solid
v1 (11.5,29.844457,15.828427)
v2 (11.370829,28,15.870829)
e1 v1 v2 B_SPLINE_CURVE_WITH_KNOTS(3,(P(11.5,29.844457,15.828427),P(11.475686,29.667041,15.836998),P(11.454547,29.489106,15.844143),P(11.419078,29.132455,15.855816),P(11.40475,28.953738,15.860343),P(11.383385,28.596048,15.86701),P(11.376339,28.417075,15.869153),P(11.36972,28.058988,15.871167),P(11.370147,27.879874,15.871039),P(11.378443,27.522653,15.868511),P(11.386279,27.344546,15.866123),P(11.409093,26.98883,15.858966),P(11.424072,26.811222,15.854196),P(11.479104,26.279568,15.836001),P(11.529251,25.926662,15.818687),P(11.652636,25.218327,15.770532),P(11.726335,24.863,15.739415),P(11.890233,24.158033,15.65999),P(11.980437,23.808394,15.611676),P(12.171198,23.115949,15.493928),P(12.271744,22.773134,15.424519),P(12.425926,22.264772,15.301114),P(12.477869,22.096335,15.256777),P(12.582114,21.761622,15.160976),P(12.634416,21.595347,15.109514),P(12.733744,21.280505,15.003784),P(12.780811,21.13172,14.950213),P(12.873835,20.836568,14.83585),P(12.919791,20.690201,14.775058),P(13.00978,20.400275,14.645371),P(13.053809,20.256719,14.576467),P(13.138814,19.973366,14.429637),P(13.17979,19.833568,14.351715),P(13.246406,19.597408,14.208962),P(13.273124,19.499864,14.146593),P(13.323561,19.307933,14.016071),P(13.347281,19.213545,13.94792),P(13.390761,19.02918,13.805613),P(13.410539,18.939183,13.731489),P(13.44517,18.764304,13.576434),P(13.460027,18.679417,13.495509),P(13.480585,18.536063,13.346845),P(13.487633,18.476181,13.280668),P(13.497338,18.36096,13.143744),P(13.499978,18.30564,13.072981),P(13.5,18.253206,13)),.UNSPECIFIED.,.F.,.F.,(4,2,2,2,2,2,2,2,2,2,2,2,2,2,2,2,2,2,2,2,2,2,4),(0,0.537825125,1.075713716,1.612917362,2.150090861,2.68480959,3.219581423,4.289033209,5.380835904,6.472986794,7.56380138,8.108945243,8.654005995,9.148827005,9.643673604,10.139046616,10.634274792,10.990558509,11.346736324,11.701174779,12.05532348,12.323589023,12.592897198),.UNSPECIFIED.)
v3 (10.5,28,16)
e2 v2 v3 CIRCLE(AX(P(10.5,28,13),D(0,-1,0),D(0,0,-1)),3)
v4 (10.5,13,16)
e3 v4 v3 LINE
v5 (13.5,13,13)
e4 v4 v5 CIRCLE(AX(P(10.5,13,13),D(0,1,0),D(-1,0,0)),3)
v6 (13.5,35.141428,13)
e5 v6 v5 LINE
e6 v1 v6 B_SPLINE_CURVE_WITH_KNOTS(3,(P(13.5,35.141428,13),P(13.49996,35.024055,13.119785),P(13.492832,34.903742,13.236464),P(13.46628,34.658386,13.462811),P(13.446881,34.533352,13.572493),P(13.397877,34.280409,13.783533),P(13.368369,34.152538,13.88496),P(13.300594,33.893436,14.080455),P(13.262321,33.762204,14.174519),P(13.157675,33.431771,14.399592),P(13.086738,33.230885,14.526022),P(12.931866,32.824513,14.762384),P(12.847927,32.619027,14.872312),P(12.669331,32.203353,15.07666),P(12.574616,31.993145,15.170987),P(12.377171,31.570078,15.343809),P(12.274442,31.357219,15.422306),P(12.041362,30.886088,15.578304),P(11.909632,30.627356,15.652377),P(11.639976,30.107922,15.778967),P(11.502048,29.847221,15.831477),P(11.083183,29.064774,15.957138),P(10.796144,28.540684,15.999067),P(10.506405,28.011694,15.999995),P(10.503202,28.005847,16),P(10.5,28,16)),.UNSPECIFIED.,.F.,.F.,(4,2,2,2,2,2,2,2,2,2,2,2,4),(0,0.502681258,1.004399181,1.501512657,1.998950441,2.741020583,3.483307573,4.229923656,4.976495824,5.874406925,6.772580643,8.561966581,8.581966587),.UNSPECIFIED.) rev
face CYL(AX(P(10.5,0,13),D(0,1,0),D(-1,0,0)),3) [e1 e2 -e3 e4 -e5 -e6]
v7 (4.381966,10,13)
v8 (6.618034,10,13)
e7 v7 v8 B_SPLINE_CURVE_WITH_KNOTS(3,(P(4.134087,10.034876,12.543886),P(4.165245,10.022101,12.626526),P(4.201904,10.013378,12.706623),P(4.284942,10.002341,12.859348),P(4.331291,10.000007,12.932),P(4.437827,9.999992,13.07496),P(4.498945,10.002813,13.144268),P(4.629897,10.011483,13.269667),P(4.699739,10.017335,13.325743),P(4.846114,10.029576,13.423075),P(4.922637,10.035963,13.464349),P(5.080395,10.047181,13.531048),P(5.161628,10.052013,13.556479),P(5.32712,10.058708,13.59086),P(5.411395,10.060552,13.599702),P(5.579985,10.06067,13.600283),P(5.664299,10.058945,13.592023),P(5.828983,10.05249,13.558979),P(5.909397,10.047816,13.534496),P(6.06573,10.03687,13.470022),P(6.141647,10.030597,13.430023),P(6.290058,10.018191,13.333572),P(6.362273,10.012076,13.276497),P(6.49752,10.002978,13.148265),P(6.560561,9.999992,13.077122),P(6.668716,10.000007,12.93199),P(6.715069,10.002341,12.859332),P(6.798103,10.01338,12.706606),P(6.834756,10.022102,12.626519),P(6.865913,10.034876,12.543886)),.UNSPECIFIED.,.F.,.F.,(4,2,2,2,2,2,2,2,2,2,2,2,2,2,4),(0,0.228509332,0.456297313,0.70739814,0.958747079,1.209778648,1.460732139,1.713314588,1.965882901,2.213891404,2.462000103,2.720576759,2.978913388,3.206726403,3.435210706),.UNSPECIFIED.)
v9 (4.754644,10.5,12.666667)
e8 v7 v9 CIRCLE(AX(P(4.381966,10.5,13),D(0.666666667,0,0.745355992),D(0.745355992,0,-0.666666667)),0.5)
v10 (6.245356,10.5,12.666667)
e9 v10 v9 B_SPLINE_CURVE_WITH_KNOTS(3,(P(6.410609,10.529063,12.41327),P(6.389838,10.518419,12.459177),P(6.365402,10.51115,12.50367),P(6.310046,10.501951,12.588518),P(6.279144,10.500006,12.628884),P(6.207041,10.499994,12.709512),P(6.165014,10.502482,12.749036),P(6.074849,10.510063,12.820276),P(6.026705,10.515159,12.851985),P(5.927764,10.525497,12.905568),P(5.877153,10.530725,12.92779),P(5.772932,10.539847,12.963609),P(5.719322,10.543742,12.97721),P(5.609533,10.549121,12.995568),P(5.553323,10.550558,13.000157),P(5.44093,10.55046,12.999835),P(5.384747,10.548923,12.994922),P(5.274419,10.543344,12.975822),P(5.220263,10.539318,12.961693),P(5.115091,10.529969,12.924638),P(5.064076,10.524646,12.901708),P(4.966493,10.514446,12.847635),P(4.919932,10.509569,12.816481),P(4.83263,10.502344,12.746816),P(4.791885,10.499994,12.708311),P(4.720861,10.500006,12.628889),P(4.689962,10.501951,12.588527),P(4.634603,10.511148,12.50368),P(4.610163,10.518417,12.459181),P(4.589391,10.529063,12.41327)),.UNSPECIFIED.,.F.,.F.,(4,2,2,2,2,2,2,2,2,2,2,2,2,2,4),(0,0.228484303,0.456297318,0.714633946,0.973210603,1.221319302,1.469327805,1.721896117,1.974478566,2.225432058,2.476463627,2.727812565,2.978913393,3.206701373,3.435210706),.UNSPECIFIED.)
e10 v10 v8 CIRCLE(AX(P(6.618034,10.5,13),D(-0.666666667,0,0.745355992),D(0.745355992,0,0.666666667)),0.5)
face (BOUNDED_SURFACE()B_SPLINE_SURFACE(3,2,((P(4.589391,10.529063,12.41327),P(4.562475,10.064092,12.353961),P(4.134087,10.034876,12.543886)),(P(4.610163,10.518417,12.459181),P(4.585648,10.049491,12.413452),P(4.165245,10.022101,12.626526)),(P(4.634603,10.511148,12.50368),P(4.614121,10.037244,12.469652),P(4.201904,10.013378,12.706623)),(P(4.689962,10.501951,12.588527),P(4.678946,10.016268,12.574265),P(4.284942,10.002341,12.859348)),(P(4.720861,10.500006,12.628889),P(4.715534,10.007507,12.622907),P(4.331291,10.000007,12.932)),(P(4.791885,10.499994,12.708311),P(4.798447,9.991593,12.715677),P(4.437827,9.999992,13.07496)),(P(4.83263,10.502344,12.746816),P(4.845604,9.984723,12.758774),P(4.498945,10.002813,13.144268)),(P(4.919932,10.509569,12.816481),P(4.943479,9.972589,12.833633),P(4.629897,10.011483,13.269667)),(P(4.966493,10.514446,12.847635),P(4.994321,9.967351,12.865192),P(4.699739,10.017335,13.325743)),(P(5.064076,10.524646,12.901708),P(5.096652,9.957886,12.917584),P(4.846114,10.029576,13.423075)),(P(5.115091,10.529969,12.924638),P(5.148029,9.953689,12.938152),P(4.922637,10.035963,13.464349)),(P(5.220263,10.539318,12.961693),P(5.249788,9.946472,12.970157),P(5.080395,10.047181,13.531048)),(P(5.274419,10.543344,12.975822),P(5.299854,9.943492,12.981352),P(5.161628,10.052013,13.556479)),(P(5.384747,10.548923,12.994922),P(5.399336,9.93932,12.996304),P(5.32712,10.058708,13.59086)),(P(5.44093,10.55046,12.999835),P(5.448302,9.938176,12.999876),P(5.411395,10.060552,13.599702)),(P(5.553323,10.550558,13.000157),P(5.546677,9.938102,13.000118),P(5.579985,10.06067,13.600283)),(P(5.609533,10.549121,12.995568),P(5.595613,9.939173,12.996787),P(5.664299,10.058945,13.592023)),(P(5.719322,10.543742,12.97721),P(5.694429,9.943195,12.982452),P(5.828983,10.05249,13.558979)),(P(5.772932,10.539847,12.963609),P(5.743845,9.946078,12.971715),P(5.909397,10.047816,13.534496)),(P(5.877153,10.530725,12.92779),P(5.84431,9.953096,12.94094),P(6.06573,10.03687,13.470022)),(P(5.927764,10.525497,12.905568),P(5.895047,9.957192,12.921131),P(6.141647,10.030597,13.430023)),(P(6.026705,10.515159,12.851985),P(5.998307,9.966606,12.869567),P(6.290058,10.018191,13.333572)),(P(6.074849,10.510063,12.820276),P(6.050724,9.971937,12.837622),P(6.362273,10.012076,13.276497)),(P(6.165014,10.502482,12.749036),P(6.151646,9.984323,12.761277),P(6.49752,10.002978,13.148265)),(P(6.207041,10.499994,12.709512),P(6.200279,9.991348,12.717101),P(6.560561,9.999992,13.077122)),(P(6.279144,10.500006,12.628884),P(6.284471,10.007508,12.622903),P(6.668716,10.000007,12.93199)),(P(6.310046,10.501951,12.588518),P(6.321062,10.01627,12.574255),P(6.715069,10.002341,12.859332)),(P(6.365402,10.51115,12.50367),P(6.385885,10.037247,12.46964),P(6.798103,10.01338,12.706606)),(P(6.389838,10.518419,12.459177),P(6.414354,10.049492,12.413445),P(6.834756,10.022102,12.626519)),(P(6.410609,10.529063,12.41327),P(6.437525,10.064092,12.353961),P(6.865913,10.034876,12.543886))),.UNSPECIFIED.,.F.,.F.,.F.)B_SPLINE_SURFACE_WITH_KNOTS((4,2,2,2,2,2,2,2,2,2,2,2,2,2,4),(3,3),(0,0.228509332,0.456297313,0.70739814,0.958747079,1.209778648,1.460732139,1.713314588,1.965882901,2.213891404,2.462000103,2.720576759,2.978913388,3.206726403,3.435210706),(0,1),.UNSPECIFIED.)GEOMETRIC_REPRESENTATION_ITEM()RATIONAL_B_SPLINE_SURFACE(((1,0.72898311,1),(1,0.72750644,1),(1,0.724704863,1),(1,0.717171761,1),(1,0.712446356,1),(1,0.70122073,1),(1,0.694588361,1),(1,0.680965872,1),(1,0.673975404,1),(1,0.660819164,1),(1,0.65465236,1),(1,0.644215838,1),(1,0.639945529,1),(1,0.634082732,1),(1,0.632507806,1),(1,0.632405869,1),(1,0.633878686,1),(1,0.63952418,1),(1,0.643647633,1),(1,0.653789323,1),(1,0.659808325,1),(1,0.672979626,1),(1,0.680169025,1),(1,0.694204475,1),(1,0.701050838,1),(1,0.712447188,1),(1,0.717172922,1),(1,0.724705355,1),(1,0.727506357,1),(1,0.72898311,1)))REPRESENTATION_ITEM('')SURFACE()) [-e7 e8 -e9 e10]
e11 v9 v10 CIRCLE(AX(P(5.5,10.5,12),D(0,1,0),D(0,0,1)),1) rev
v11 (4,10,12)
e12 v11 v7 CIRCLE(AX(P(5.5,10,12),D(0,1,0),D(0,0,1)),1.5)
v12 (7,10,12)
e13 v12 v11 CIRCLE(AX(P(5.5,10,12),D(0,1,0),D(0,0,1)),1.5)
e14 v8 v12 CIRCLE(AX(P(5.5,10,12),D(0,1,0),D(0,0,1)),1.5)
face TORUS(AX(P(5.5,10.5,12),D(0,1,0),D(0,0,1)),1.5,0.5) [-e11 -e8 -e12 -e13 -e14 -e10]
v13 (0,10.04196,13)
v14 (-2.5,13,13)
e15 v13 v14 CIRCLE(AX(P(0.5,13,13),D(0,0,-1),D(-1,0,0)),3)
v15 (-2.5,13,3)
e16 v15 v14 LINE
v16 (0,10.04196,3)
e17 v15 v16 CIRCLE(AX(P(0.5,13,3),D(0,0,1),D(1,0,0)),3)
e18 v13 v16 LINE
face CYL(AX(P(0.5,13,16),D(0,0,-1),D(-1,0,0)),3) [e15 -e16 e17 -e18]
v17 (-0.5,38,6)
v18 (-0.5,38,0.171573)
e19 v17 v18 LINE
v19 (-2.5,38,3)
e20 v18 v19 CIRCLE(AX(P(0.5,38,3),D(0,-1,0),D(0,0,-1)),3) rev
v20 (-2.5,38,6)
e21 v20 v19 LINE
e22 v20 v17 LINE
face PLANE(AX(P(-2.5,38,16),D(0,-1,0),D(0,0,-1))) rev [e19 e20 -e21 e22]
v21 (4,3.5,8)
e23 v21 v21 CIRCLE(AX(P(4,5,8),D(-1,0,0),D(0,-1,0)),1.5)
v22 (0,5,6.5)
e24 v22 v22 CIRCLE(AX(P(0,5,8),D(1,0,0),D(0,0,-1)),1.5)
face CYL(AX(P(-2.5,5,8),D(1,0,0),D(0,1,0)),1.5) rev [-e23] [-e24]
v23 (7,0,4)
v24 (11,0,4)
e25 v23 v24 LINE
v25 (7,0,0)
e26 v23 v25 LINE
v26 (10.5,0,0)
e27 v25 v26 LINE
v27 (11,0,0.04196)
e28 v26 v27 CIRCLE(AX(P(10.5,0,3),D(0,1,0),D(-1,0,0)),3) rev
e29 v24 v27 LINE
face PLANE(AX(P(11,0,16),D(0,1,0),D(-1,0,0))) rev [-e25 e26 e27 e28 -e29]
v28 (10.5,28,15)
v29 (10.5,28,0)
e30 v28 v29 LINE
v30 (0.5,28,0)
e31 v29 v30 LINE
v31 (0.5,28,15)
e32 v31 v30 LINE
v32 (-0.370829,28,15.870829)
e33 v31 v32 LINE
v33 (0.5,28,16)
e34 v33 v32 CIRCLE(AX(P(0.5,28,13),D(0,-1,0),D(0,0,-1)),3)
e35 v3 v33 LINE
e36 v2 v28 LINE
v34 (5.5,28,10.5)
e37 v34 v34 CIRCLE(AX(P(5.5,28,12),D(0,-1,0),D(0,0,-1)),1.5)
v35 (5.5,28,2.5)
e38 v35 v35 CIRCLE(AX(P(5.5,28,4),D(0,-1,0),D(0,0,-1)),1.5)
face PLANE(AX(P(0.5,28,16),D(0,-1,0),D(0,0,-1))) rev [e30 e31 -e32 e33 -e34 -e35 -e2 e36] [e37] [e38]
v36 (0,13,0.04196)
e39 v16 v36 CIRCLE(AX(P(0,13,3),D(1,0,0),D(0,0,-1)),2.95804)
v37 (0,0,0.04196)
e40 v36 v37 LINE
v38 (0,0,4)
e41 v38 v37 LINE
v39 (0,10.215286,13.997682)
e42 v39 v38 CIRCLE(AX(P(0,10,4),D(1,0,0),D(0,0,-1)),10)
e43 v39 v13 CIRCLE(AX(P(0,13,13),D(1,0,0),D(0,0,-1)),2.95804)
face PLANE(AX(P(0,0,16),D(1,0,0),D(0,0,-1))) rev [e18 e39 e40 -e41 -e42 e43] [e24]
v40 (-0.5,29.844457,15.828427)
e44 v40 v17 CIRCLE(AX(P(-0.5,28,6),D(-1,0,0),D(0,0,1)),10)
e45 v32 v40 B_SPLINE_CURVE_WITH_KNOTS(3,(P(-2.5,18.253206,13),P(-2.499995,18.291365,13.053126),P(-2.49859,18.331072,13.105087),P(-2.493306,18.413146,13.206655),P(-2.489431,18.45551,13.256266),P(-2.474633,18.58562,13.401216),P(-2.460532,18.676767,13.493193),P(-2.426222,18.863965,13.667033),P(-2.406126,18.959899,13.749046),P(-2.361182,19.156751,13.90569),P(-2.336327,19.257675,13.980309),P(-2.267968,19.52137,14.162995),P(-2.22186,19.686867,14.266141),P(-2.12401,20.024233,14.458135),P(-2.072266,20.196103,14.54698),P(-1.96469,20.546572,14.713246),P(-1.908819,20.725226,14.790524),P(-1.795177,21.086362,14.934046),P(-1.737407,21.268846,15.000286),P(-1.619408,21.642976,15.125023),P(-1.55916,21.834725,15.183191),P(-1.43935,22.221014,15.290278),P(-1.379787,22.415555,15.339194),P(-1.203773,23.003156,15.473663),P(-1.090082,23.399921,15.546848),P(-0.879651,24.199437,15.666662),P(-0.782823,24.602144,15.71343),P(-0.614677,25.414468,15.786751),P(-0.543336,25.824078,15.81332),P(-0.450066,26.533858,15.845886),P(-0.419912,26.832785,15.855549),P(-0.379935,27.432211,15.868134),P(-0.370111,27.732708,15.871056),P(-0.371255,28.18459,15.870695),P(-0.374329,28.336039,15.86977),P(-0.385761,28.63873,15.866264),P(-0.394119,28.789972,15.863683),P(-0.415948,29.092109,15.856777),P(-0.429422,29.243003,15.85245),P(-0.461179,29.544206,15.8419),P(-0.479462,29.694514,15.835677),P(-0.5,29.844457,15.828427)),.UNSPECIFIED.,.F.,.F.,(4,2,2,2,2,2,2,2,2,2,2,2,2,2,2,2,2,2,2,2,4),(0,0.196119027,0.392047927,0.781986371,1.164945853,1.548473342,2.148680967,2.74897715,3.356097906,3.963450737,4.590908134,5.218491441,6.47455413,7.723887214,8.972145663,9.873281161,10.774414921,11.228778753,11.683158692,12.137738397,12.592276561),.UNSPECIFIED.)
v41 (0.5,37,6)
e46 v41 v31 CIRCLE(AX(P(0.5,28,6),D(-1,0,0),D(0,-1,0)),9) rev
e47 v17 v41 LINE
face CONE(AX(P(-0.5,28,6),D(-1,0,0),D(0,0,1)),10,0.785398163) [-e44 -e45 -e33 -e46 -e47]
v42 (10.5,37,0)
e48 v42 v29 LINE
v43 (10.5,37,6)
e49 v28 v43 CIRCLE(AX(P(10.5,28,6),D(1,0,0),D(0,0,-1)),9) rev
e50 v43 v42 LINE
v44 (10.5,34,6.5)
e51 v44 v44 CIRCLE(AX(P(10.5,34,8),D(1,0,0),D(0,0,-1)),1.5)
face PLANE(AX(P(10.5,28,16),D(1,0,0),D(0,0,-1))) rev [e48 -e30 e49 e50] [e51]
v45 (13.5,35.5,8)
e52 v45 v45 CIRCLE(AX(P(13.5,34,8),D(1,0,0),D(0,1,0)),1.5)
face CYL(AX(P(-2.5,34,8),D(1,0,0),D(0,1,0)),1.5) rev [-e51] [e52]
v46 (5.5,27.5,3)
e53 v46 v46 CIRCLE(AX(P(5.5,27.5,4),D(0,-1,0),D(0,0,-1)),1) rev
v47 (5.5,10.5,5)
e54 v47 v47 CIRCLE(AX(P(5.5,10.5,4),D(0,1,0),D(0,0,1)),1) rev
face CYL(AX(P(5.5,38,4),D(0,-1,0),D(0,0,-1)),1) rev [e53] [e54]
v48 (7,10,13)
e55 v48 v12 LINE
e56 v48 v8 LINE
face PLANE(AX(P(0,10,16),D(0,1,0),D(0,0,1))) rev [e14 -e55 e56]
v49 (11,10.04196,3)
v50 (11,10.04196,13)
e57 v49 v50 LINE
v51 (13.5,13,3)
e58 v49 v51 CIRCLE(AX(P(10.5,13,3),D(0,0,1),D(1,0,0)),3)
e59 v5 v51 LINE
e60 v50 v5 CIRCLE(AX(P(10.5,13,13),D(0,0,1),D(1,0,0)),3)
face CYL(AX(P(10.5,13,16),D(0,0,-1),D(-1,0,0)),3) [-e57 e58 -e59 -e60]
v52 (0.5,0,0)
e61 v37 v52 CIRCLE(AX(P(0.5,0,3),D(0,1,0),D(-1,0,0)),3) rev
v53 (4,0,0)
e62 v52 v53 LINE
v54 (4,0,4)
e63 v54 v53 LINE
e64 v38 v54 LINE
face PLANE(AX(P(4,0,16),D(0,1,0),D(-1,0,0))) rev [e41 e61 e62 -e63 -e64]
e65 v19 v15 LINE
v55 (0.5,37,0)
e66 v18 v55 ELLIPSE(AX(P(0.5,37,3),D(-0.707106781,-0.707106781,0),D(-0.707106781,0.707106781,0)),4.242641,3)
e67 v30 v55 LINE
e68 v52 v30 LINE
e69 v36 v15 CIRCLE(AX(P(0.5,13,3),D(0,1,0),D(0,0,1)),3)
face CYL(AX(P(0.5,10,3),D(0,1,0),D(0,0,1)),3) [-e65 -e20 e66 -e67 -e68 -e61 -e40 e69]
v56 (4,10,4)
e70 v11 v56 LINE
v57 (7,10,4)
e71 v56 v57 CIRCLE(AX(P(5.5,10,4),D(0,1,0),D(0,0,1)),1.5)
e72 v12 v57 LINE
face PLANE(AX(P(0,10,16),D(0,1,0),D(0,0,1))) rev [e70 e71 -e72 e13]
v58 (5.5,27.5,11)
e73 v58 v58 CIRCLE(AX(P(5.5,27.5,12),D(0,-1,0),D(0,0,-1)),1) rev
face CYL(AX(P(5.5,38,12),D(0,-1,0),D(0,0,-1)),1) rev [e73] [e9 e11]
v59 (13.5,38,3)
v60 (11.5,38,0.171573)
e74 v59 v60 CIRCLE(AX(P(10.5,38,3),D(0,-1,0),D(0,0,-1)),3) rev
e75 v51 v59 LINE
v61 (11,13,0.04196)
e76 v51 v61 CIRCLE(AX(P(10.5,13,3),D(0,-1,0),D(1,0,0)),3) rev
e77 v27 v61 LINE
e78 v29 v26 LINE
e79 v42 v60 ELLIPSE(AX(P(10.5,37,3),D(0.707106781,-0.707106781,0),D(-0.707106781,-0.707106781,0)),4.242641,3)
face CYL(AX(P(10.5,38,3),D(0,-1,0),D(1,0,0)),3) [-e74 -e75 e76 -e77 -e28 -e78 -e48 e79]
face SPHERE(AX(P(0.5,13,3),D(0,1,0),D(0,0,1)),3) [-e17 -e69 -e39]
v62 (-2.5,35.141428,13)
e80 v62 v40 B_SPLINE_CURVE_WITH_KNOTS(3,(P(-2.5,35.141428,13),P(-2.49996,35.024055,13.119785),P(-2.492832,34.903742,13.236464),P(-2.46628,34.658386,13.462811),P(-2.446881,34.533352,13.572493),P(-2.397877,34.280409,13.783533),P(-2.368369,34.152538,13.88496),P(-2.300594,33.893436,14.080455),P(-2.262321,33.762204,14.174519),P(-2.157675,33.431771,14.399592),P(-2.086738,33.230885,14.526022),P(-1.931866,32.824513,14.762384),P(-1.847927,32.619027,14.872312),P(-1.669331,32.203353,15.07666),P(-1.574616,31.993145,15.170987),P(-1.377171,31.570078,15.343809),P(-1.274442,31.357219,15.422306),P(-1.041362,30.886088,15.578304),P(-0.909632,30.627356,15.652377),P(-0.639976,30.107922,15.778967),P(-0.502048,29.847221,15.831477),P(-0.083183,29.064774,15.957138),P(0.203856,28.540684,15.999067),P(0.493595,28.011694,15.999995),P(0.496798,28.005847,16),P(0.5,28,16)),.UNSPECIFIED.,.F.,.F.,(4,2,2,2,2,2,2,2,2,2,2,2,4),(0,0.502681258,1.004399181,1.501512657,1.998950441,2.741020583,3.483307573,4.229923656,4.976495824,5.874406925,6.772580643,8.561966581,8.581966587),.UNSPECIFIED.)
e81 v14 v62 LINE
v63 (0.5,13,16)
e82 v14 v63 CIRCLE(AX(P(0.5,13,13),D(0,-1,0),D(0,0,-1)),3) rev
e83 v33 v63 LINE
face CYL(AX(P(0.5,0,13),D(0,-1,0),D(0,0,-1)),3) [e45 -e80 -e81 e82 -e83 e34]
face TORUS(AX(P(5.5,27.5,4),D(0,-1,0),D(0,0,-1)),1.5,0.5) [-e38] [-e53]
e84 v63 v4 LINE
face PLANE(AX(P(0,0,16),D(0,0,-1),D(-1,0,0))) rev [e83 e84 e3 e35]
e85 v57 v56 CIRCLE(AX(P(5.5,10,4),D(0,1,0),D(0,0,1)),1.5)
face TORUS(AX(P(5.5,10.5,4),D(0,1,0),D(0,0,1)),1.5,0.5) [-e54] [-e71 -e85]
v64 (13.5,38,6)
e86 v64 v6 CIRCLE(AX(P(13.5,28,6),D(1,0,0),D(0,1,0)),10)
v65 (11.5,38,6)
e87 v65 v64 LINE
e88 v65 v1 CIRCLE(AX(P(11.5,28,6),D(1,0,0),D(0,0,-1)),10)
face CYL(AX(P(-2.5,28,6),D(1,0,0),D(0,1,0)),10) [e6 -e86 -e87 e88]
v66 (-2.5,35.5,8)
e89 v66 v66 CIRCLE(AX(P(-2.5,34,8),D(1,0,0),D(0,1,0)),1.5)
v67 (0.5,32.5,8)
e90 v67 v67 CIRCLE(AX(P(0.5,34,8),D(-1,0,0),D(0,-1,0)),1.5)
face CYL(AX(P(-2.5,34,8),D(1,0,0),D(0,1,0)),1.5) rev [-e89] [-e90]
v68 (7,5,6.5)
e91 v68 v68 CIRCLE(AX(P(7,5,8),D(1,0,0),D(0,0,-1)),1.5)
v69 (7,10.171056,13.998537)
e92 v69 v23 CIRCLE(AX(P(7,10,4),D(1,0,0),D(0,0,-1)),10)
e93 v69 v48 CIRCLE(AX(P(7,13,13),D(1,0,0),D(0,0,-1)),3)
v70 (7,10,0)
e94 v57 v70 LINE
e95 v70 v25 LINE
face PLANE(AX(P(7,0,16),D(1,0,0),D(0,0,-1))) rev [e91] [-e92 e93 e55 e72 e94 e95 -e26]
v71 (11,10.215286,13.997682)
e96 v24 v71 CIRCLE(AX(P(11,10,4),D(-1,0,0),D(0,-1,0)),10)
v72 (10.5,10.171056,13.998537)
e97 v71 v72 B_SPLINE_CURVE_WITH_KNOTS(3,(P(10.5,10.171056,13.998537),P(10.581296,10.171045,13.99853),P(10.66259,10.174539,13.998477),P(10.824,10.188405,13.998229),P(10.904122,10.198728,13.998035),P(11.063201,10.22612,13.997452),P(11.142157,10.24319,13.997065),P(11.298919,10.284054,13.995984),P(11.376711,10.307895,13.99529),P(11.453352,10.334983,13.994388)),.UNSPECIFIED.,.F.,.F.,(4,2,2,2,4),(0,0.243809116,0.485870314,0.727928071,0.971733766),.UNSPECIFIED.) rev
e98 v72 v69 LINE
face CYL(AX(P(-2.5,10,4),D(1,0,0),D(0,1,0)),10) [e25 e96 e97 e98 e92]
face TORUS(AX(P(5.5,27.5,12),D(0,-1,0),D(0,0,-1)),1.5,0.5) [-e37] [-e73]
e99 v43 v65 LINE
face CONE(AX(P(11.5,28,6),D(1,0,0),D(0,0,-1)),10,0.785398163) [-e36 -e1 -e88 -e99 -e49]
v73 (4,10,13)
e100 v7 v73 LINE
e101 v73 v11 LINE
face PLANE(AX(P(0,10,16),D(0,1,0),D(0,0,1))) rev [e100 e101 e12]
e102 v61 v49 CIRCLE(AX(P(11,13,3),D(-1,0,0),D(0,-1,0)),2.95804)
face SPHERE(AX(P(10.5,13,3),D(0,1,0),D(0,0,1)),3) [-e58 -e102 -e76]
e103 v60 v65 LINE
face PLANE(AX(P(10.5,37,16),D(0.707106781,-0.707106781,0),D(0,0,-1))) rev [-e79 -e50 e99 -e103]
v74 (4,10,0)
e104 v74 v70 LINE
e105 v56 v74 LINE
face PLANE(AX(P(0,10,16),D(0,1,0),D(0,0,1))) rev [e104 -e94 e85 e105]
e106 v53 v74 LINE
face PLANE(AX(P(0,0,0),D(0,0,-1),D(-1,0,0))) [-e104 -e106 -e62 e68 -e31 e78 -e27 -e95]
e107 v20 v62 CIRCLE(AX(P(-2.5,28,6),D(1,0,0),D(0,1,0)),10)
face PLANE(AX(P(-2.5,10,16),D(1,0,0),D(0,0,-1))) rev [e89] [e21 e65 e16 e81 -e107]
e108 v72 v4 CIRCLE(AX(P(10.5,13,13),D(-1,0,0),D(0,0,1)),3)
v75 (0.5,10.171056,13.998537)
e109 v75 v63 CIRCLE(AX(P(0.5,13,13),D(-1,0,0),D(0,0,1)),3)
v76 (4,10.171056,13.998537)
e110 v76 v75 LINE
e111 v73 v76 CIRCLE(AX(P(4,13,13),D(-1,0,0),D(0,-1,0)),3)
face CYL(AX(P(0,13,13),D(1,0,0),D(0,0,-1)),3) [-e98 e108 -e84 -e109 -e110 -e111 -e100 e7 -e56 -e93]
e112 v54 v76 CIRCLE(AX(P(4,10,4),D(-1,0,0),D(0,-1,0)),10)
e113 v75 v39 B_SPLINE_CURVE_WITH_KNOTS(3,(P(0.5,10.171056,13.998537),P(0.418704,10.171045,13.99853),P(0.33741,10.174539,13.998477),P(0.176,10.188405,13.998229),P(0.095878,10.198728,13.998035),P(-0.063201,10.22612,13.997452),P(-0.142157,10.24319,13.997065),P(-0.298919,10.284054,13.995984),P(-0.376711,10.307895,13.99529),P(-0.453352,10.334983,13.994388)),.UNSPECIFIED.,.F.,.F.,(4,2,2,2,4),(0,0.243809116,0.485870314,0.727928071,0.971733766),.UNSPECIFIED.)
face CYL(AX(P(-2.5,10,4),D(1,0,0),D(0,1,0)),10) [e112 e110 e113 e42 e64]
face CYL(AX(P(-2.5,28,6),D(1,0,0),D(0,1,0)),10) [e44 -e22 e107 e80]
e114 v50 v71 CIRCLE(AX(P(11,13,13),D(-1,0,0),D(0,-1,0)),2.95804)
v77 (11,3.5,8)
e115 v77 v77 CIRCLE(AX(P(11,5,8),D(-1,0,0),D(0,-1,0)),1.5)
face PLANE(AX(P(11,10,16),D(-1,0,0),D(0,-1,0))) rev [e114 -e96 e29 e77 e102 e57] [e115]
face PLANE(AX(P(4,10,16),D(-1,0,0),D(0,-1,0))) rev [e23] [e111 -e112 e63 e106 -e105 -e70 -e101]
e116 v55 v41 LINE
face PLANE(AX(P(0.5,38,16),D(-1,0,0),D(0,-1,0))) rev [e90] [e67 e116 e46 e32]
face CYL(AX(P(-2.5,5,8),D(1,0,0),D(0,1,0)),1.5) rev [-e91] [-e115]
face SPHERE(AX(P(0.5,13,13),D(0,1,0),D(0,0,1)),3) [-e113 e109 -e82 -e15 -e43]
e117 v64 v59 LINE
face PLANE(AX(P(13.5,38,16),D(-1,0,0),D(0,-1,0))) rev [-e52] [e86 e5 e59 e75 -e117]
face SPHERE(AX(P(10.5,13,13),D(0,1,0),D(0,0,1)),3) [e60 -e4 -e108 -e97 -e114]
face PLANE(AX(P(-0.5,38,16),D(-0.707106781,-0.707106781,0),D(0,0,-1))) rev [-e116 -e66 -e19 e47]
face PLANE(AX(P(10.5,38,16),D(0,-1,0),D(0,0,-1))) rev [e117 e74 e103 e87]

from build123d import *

# Parameters (mm, degrees)
BOSS_EXTRUDE1_DEPTH     = 16
CUT_EXTRUDE1_DEPTH      = 44.384905209
CUT_EXTRUDE1_DEPTH_BACK = 44.384905209
SKETCH2_R               = 1.5
FILLET1_DEPTH           = 38
SKETCH3_R               = 1
CUT_EXTRUDE2_DEPTH      = 35.960692377
FILLET2_R               = 3
CHAMFER1_SIZE           = 1
CONG_1_R                = 0.5


with BuildPart() as part:
    # Sketch1 → Boss-Extrude1 (new body)
    with BuildSketch(Plane.XY):
        Polygon((0, 0), (0, 10), (-2.5, 10), (-2.5, 38), (0.5, 38), (0.5, 28), (10.5, 28), (10.5, 38), (13.5, 38), (13.5, 10), (11, 10), (11, 0), (7, 0), (7, 10), (4, 10), (4, 0), align=None)
    extrude(amount=BOSS_EXTRUDE1_DEPTH)

    # Sketch2 → Cut-Extrude1 (cut, two sides: drawn at the far end of the back side and taken through both)
    with BuildSketch(Plane(origin=(11, 0, 0), x_dir=(0, 0, -1), z_dir=(1, 0, 0)).offset(-CUT_EXTRUDE1_DEPTH_BACK)):
        with BuildLine():
            Line((-16, 0), (-4, 0))
            ThreePointArc((-4, 0), (-11.071067812, 2.928932188), (-14, 10))
            Line((-14, 10), (-16, 10))
            Line((-16, 10), (-16, 0))
        make_face()
        with BuildLine():
            Line((-16, 38), (-16, 28))
            ThreePointArc((-16, 28), (-13.071067812, 35.071067812), (-6, 38))
            Line((-6, 38), (-16, 38))
        make_face()
        with Locations((-8, 5)):
            Circle(SKETCH2_R)
        with Locations(Location((-8, 34, 0), (0, 0, 90))):
            Circle(SKETCH2_R)
    extrude(amount=CUT_EXTRUDE1_DEPTH + CUT_EXTRUDE1_DEPTH_BACK, mode=Mode.SUBTRACT)

    # Fillet1: read off the stored shape, not the designer's step
    # Fillet1 outline → Fillet1 (cut)
    with BuildSketch(Plane(origin=(0, 0, 0), x_dir=(1, 0, 0), z_dir=(0, 1, 0))):
        with BuildLine():
            Line((13.5, 0), (10.5, 0))
            ThreePointArc((10.5, 0), (12.621320344, -0.878679656), (13.5, -3))
            Line((13.5, -3), (13.5, 0))
        make_face()
        with BuildLine():
            ThreePointArc((-2.5, -3), (-1.621320344, -0.878679656), (0.5, 0))
            Line((0.5, 0), (-2.5, 0))
            Line((-2.5, 0), (-2.5, -3))
        make_face()
        with BuildLine():
            Line((13.5, -16), (13.5, -13))
            ThreePointArc((13.5, -13), (12.621320344, -15.121320344), (10.5, -16))
            Line((10.5, -16), (13.5, -16))
        make_face()
        with BuildLine():
            ThreePointArc((0.5, -16), (-1.621320344, -15.121320344), (-2.5, -13))
            Line((-2.5, -13), (-2.5, -16))
            Line((-2.5, -16), (0.5, -16))
        make_face()
    extrude(amount=FILLET1_DEPTH, mode=Mode.SUBTRACT)

    # Sketch3 → Cut-Extrude2 (cut, through all)
    with BuildSketch(Plane.XZ.offset(-10)):
        with Locations(Location((5.5, 12, 0), (0, 0, 270))):
            Circle(SKETCH3_R)
        with Locations(Location((5.5, 4, 0), (0, 0, 270))):
            Circle(SKETCH3_R)
    extrude(amount=-CUT_EXTRUDE2_DEPTH, mode=Mode.SUBTRACT)

    # Fillet2
    # the kernel refuses this fillet: 3 mm, written as the material it takes off along each edge
    with BuildSketch(Plane(origin=(0.499999998, 10, 2.999999998), x_dir=(-1.0, 0, 5.011576341616869e-10), z_dir=(5.011576341616869e-10, 0, 1.0))) as fillet2_piece_1_section:
        with BuildLine():
            CenterArc((2.999999998 - FILLET2_R, -FILLET2_R), FILLET2_R, 0, 89.999999971)
            Line((2.999999998 - FILLET2_R, 0), (2.999999998, 0))
            Line((2.999999998, 0), (2.999999998, -FILLET2_R))
        make_face()
    fillet2_piece_1 = revolve(axis=Axis((0.499999998, 10, 2.999999998), (0, -1, 0)), revolution_arc=223.691304691, mode=Mode.PRIVATE)
    fillet2_piece_1 = split(fillet2_piece_1, bisect_by=Plane(origin=(0, 10, 2.999999998), z_dir=(-1, 0, 0)), keep=Keep.TOP, mode=Mode.PRIVATE)
    add(fillet2_piece_1, mode=Mode.SUBTRACT)
    with BuildSketch(Plane(origin=(10.500000002, 10, 2.999999998), x_dir=(-0.7230719874734535, 0, 0.6907726839787384), z_dir=(0.6907726839787384, 0, 0.7230719874734535))) as fillet2_piece_2_section:
        with BuildLine():
            CenterArc((2.999999998 - FILLET2_R, -FILLET2_R), FILLET2_R, 0, 89.999999971)
            Line((2.999999998, -FILLET2_R), (2.999999998, 0))
            Line((2.999999998, 0), (2.999999998 - FILLET2_R, 0))
        make_face()
    fillet2_piece_2 = revolve(axis=Axis((10.500000002, 10, 2.999999998), (0, -1, 0)), revolution_arc=223.691304691, mode=Mode.PRIVATE)
    fillet2_piece_2 = split(fillet2_piece_2, bisect_by=Plane(origin=(11, 10, 2.999999998), z_dir=(1, 0, 0)), keep=Keep.TOP, mode=Mode.PRIVATE)
    add(fillet2_piece_2, mode=Mode.SUBTRACT)
    with BuildSketch(Plane(origin=(10.5, 10, 16), x_dir=(0, 0, -1), z_dir=(-1, 0, 0))) as fillet2_piece_3_section:
        with BuildLine():
            CenterArc((FILLET2_R, -FILLET2_R), FILLET2_R, 90, 90)
            Line((0, -FILLET2_R), (0, 0))
            Line((0, 0), (FILLET2_R, 0))
        make_face()
    fillet2_piece_3 = extrude(amount=10, mode=Mode.PRIVATE)
    fillet2_piece_3 = fillet2_piece_3 - Plane(origin=(10.5, 10, 4), x_dir=(0, -1, 0), z_dir=(-1, 0, 0)) * Cylinder(10, 32, mode=Mode.PRIVATE)
    fillet2_piece_3 = split(fillet2_piece_3, bisect_by=Plane(origin=(7, 10, 16), z_dir=(1, 0, 0)), keep=Keep.TOP, mode=Mode.PRIVATE)
    add(fillet2_piece_3, mode=Mode.SUBTRACT)
    with BuildSketch(Plane(origin=(10.5, 10, 16), x_dir=(0, 0, -1), z_dir=(-1, 0, 0))) as fillet2_piece_4_section:
        with BuildLine():
            CenterArc((FILLET2_R, -FILLET2_R), FILLET2_R, 90, 90)
            Line((0, -FILLET2_R), (0, 0))
            Line((0, 0), (FILLET2_R, 0))
        make_face()
    fillet2_piece_4 = extrude(amount=10, mode=Mode.PRIVATE)
    fillet2_piece_4 = fillet2_piece_4 & Plane(origin=(10.5, 10, 4), x_dir=(0, -1, 0), z_dir=(-1, 0, 0)) * Cylinder(10, 32, mode=Mode.PRIVATE)
    fillet2_piece_4 = split(fillet2_piece_4, bisect_by=Plane(origin=(4, 10, 16), z_dir=(1, 0, 0)), keep=Keep.TOP, mode=Mode.PRIVATE)
    fillet2_piece_4 = split(fillet2_piece_4, bisect_by=Plane(origin=(7, 10, 16), z_dir=(-1, 0, 0)), keep=Keep.TOP, mode=Mode.PRIVATE)
    add(fillet2_piece_4, mode=Mode.SUBTRACT)
    with BuildSketch(Plane(origin=(10.5, 10, 16), x_dir=(0, 0, -1), z_dir=(-1, 0, 0))) as fillet2_piece_5_section:
        with BuildLine():
            CenterArc((FILLET2_R, -FILLET2_R), FILLET2_R, 90, 90)
            Line((0, -FILLET2_R), (0, 0))
            Line((0, 0), (FILLET2_R, 0))
        make_face()
    fillet2_piece_5 = extrude(amount=10, mode=Mode.PRIVATE)
    fillet2_piece_5 = fillet2_piece_5 - Plane(origin=(10.5, 10, 4), x_dir=(0, -1, 0), z_dir=(-1, 0, 0)) * Cylinder(10, 32, mode=Mode.PRIVATE)
    fillet2_piece_5 = split(fillet2_piece_5, bisect_by=Plane(origin=(4, 10, 16), z_dir=(1, 0, 0)), keep=Keep.TOP, mode=Mode.PRIVATE)
    fillet2_piece_5 = split(fillet2_piece_5, bisect_by=Plane(origin=(7, 10, 16), z_dir=(-1, 0, 0)), keep=Keep.TOP, mode=Mode.PRIVATE)
    add(fillet2_piece_5, mode=Mode.SUBTRACT)
    with BuildSketch(Plane(origin=(10.5, 10, 16), x_dir=(0, 0, -1), z_dir=(-1, 0, 0))) as fillet2_piece_6_section:
        with BuildLine():
            CenterArc((FILLET2_R, -FILLET2_R), FILLET2_R, 90, 90)
            Line((0, -FILLET2_R), (0, 0))
            Line((0, 0), (FILLET2_R, 0))
        make_face()
    fillet2_piece_6 = extrude(amount=10, mode=Mode.PRIVATE)
    fillet2_piece_6 = fillet2_piece_6 - Plane(origin=(10.5, 10, 4), x_dir=(0, -1, 0), z_dir=(-1, 0, 0)) * Cylinder(10, 32, mode=Mode.PRIVATE)
    fillet2_piece_6 = split(fillet2_piece_6, bisect_by=Plane(origin=(4, 10, 16), z_dir=(-1, 0, 0)), keep=Keep.TOP, mode=Mode.PRIVATE)
    add(fillet2_piece_6, mode=Mode.SUBTRACT)
    with BuildSketch(Plane(origin=(10.500000002, 10, 13.000000002), x_dir=(1.0, 0, -5.011588183995811e-10), z_dir=(-5.011588183995811e-10, 0, -1.0))) as fillet2_piece_7_section:
        with BuildLine():
            CenterArc((2.999999998 - FILLET2_R, -FILLET2_R), FILLET2_R, 0, 89.999999971)
            Line((2.999999998, -FILLET2_R), (2.999999998, 0))
            Line((2.999999998, 0), (2.999999998 - FILLET2_R, 0))
        make_face()
    fillet2_piece_7 = revolve(axis=Axis((10.500000002, 10, 13.000000002), (0, -1, 0)), revolution_arc=90.000000057, mode=Mode.PRIVATE)
    fillet2_piece_7 = fillet2_piece_7 & Plane(origin=(10.500000002, 10, 4), x_dir=(0, -1, 0), z_dir=(-1, 0, 0)) * Cylinder(10, 12, mode=Mode.PRIVATE)
    fillet2_piece_7 = split(fillet2_piece_7, bisect_by=Plane(origin=(11, 10, 13.000000002), z_dir=(1, 0, 0)), keep=Keep.TOP, mode=Mode.PRIVATE)
    add(fillet2_piece_7, mode=Mode.SUBTRACT)
    with BuildSketch(Plane(origin=(10.500000002, 10, 13.000000002), x_dir=(1.0, 0, -5.011588183995811e-10), z_dir=(-5.011588183995811e-10, 0, -1.0))) as fillet2_piece_8_section:
        with BuildLine():
            CenterArc((2.999999998 - FILLET2_R, -FILLET2_R), FILLET2_R, 0, 89.999999971)
            Line((2.999999998, -FILLET2_R), (2.999999998, 0))
            Line((2.999999998, 0), (2.999999998 - FILLET2_R, 0))
        make_face()
    fillet2_piece_8 = revolve(axis=Axis((10.500000002, 10, 13.000000002), (0, -1, 0)), revolution_arc=90.000000057, mode=Mode.PRIVATE)
    fillet2_piece_8 = fillet2_piece_8 - Plane(origin=(10.500000002, 10, 4), x_dir=(0, -1, 0), z_dir=(-1, 0, 0)) * Cylinder(10, 12, mode=Mode.PRIVATE)
    fillet2_piece_8 = split(fillet2_piece_8, bisect_by=Plane(origin=(11, 10, 13.000000002), z_dir=(-1, 0, 0)), keep=Keep.TOP, mode=Mode.PRIVATE)
    add(fillet2_piece_8, mode=Mode.SUBTRACT)
    with BuildSketch(Plane(origin=(10.500000002, 10, 13.000000002), x_dir=(1.0, 0, -5.011588183995811e-10), z_dir=(-5.011588183995811e-10, 0, -1.0))) as fillet2_piece_9_section:
        with BuildLine():
            CenterArc((2.999999998 - FILLET2_R, -FILLET2_R), FILLET2_R, 0, 89.999999971)
            Line((2.999999998, -FILLET2_R), (2.999999998, 0))
            Line((2.999999998, 0), (2.999999998 - FILLET2_R, 0))
        make_face()
    fillet2_piece_9 = revolve(axis=Axis((10.500000002, 10, 13.000000002), (0, -1, 0)), revolution_arc=90.000000057, mode=Mode.PRIVATE)
    fillet2_piece_9 = fillet2_piece_9 - Plane(origin=(10.500000002, 10, 4), x_dir=(0, -1, 0), z_dir=(-1, 0, 0)) * Cylinder(10, 12, mode=Mode.PRIVATE)
    fillet2_piece_9 = split(fillet2_piece_9, bisect_by=Plane(origin=(11, 10, 13.000000002), z_dir=(1, 0, 0)), keep=Keep.TOP, mode=Mode.PRIVATE)
    add(fillet2_piece_9, mode=Mode.SUBTRACT)
    with BuildSketch(Plane(origin=(0.499999998, 10, 13.000000002), x_dir=(5.011584483252393e-10, 0, 1.0), z_dir=(1.0, 0, -5.011584483252393e-10))) as fillet2_piece_10_section:
        with BuildLine():
            CenterArc((2.999999998 - FILLET2_R, -FILLET2_R), FILLET2_R, 0, 89.999999971)
            Line((2.999999998, -FILLET2_R), (2.999999998, 0))
            Line((2.999999998, 0), (2.999999998 - FILLET2_R, 0))
        make_face()
    fillet2_piece_10 = revolve(axis=Axis((0.499999998, 10, 13.000000002), (0, -1, 0)), revolution_arc=90.000000057, mode=Mode.PRIVATE)
    fillet2_piece_10 = split(fillet2_piece_10, bisect_by=Plane(origin=(0, 10, 13.000000002), z_dir=(1, 0, 0)), keep=Keep.TOP, mode=Mode.PRIVATE)
    fillet2_piece_10 = fillet2_piece_10 - Plane(origin=(0.499999998, 10, 4), x_dir=(0, -1, 0), z_dir=(-1, 0, 0)) * Cylinder(10, 12, mode=Mode.PRIVATE)
    add(fillet2_piece_10, mode=Mode.SUBTRACT)
    with BuildSketch(Plane(origin=(0.499999998, 10, 13.000000002), x_dir=(5.011584483252393e-10, 0, 1.0), z_dir=(1.0, 0, -5.011584483252393e-10))) as fillet2_piece_11_section:
        with BuildLine():
            CenterArc((2.999999998 - FILLET2_R, -FILLET2_R), FILLET2_R, 0, 89.999999971)
            Line((2.999999998, -FILLET2_R), (2.999999998, 0))
            Line((2.999999998, 0), (2.999999998 - FILLET2_R, 0))
        make_face()
    fillet2_piece_11 = revolve(axis=Axis((0.499999998, 10, 13.000000002), (0, -1, 0)), revolution_arc=90.000000057, mode=Mode.PRIVATE)
    fillet2_piece_11 = split(fillet2_piece_11, bisect_by=Plane(origin=(0, 10, 13.000000002), z_dir=(-1, 0, 0)), keep=Keep.TOP, mode=Mode.PRIVATE)
    fillet2_piece_11 = fillet2_piece_11 & Plane(origin=(0.499999998, 10, 4), x_dir=(0, -1, 0), z_dir=(-1, 0, 0)) * Cylinder(10, 12, mode=Mode.PRIVATE)
    add(fillet2_piece_11, mode=Mode.SUBTRACT)
    with BuildSketch(Plane(origin=(0.499999998, 10, 13.000000002), x_dir=(5.011584483252393e-10, 0, 1.0), z_dir=(1.0, 0, -5.011584483252393e-10))) as fillet2_piece_12_section:
        with BuildLine():
            CenterArc((2.999999998 - FILLET2_R, -FILLET2_R), FILLET2_R, 0, 89.999999971)
            Line((2.999999998, -FILLET2_R), (2.999999998, 0))
            Line((2.999999998, 0), (2.999999998 - FILLET2_R, 0))
        make_face()
    fillet2_piece_12 = revolve(axis=Axis((0.499999998, 10, 13.000000002), (0, -1, 0)), revolution_arc=90.000000057, mode=Mode.PRIVATE)
    fillet2_piece_12 = split(fillet2_piece_12, bisect_by=Plane(origin=(0, 10, 13.000000002), z_dir=(-1, 0, 0)), keep=Keep.TOP, mode=Mode.PRIVATE)
    fillet2_piece_12 = fillet2_piece_12 - Plane(origin=(0.499999998, 10, 4), x_dir=(0, -1, 0), z_dir=(-1, 0, 0)) * Cylinder(10, 12, mode=Mode.PRIVATE)
    add(fillet2_piece_12, mode=Mode.SUBTRACT)
    with BuildSketch(Plane(origin=(-2.5, 10, 13), x_dir=(1, 0, 0), z_dir=(0, 0, -1))) as fillet2_piece_13_section:
        with BuildLine():
            CenterArc((FILLET2_R, -FILLET2_R), FILLET2_R, 90, 90)
            Line((0, -FILLET2_R), (0, 0))
            Line((0, 0), (FILLET2_R, 0))
        make_face()
    fillet2_piece_13 = extrude(amount=10, mode=Mode.PRIVATE)
    fillet2_piece_13 = split(fillet2_piece_13, bisect_by=Plane(origin=(0, 10, 13), z_dir=(-1, 0, 0)), keep=Keep.TOP, mode=Mode.PRIVATE)
    add(fillet2_piece_13, mode=Mode.SUBTRACT)
    with BuildSketch(Plane(origin=(13.5, 10, 3), x_dir=(-1, 0, 0), z_dir=(0, 0, 1))) as fillet2_piece_14_section:
        with BuildLine():
            CenterArc((FILLET2_R, -FILLET2_R), FILLET2_R, 90, 90)
            Line((0, -FILLET2_R), (0, 0))
            Line((0, 0), (FILLET2_R, 0))
        make_face()
    fillet2_piece_14 = extrude(amount=10, mode=Mode.PRIVATE)
    fillet2_piece_14 = split(fillet2_piece_14, bisect_by=Plane(origin=(11, 10, 3), z_dir=(1, 0, 0)), keep=Keep.TOP, mode=Mode.PRIVATE)
    add(fillet2_piece_14, mode=Mode.SUBTRACT)

    # Chamfer1
    # the kernel refuses this chamfer: 1 mm, written as the material it takes off along each edge
    with BuildSketch(Plane(origin=(10.5, 38, -2.571682988), x_dir=(0, -1, 0), z_dir=(0, 0, 1)), Plane(origin=(0.5, 38, -2.571682988), x_dir=(-1, 0, 0), z_dir=(0, 0, 1))) as chamfer1_piece_1:
        Polygon((CHAMFER1_SIZE, 0), (0, CHAMFER1_SIZE), (0, 0), align=None)
    extrude(amount=8.571682988, mode=Mode.SUBTRACT)
    with BuildSketch(Plane(origin=(10.5, 28, 6), x_dir=(0, 0, 1), z_dir=(0, -1, 0))) as chamfer1_piece_2:
        Polygon((10 - CHAMFER1_SIZE, 0), (10, -CHAMFER1_SIZE), (10, 0), align=None)
    revolve(axis=Axis((10.5, 28, 6), (-1, 0, 0)), revolution_arc=90, mode=Mode.SUBTRACT)
    with BuildSketch(Plane(origin=(0.5, 28, 6), x_dir=(0, 0, 1), z_dir=(0, -1, 0))) as chamfer1_piece_3:
        Polygon((10 - CHAMFER1_SIZE, 0), (10, CHAMFER1_SIZE), (10, 0), align=None)
    revolve(axis=Axis((0.5, 28, 6), (-1, 0, 0)), revolution_arc=90, mode=Mode.SUBTRACT)

    # Congé1
    cong_1_edges = [part.edges().sort_by_distance(p)[0] for p in [
        (5.5, 28, 13),
        (4.5, 10, 12),
        (5.5, 28, 5),
        (5.5, 10, 5),
    ]]
    fillet(cong_1_edges, radius=CONG_1_R - 0.0001)  # a hair under: the kernel refuses the full size


solid = part.part
